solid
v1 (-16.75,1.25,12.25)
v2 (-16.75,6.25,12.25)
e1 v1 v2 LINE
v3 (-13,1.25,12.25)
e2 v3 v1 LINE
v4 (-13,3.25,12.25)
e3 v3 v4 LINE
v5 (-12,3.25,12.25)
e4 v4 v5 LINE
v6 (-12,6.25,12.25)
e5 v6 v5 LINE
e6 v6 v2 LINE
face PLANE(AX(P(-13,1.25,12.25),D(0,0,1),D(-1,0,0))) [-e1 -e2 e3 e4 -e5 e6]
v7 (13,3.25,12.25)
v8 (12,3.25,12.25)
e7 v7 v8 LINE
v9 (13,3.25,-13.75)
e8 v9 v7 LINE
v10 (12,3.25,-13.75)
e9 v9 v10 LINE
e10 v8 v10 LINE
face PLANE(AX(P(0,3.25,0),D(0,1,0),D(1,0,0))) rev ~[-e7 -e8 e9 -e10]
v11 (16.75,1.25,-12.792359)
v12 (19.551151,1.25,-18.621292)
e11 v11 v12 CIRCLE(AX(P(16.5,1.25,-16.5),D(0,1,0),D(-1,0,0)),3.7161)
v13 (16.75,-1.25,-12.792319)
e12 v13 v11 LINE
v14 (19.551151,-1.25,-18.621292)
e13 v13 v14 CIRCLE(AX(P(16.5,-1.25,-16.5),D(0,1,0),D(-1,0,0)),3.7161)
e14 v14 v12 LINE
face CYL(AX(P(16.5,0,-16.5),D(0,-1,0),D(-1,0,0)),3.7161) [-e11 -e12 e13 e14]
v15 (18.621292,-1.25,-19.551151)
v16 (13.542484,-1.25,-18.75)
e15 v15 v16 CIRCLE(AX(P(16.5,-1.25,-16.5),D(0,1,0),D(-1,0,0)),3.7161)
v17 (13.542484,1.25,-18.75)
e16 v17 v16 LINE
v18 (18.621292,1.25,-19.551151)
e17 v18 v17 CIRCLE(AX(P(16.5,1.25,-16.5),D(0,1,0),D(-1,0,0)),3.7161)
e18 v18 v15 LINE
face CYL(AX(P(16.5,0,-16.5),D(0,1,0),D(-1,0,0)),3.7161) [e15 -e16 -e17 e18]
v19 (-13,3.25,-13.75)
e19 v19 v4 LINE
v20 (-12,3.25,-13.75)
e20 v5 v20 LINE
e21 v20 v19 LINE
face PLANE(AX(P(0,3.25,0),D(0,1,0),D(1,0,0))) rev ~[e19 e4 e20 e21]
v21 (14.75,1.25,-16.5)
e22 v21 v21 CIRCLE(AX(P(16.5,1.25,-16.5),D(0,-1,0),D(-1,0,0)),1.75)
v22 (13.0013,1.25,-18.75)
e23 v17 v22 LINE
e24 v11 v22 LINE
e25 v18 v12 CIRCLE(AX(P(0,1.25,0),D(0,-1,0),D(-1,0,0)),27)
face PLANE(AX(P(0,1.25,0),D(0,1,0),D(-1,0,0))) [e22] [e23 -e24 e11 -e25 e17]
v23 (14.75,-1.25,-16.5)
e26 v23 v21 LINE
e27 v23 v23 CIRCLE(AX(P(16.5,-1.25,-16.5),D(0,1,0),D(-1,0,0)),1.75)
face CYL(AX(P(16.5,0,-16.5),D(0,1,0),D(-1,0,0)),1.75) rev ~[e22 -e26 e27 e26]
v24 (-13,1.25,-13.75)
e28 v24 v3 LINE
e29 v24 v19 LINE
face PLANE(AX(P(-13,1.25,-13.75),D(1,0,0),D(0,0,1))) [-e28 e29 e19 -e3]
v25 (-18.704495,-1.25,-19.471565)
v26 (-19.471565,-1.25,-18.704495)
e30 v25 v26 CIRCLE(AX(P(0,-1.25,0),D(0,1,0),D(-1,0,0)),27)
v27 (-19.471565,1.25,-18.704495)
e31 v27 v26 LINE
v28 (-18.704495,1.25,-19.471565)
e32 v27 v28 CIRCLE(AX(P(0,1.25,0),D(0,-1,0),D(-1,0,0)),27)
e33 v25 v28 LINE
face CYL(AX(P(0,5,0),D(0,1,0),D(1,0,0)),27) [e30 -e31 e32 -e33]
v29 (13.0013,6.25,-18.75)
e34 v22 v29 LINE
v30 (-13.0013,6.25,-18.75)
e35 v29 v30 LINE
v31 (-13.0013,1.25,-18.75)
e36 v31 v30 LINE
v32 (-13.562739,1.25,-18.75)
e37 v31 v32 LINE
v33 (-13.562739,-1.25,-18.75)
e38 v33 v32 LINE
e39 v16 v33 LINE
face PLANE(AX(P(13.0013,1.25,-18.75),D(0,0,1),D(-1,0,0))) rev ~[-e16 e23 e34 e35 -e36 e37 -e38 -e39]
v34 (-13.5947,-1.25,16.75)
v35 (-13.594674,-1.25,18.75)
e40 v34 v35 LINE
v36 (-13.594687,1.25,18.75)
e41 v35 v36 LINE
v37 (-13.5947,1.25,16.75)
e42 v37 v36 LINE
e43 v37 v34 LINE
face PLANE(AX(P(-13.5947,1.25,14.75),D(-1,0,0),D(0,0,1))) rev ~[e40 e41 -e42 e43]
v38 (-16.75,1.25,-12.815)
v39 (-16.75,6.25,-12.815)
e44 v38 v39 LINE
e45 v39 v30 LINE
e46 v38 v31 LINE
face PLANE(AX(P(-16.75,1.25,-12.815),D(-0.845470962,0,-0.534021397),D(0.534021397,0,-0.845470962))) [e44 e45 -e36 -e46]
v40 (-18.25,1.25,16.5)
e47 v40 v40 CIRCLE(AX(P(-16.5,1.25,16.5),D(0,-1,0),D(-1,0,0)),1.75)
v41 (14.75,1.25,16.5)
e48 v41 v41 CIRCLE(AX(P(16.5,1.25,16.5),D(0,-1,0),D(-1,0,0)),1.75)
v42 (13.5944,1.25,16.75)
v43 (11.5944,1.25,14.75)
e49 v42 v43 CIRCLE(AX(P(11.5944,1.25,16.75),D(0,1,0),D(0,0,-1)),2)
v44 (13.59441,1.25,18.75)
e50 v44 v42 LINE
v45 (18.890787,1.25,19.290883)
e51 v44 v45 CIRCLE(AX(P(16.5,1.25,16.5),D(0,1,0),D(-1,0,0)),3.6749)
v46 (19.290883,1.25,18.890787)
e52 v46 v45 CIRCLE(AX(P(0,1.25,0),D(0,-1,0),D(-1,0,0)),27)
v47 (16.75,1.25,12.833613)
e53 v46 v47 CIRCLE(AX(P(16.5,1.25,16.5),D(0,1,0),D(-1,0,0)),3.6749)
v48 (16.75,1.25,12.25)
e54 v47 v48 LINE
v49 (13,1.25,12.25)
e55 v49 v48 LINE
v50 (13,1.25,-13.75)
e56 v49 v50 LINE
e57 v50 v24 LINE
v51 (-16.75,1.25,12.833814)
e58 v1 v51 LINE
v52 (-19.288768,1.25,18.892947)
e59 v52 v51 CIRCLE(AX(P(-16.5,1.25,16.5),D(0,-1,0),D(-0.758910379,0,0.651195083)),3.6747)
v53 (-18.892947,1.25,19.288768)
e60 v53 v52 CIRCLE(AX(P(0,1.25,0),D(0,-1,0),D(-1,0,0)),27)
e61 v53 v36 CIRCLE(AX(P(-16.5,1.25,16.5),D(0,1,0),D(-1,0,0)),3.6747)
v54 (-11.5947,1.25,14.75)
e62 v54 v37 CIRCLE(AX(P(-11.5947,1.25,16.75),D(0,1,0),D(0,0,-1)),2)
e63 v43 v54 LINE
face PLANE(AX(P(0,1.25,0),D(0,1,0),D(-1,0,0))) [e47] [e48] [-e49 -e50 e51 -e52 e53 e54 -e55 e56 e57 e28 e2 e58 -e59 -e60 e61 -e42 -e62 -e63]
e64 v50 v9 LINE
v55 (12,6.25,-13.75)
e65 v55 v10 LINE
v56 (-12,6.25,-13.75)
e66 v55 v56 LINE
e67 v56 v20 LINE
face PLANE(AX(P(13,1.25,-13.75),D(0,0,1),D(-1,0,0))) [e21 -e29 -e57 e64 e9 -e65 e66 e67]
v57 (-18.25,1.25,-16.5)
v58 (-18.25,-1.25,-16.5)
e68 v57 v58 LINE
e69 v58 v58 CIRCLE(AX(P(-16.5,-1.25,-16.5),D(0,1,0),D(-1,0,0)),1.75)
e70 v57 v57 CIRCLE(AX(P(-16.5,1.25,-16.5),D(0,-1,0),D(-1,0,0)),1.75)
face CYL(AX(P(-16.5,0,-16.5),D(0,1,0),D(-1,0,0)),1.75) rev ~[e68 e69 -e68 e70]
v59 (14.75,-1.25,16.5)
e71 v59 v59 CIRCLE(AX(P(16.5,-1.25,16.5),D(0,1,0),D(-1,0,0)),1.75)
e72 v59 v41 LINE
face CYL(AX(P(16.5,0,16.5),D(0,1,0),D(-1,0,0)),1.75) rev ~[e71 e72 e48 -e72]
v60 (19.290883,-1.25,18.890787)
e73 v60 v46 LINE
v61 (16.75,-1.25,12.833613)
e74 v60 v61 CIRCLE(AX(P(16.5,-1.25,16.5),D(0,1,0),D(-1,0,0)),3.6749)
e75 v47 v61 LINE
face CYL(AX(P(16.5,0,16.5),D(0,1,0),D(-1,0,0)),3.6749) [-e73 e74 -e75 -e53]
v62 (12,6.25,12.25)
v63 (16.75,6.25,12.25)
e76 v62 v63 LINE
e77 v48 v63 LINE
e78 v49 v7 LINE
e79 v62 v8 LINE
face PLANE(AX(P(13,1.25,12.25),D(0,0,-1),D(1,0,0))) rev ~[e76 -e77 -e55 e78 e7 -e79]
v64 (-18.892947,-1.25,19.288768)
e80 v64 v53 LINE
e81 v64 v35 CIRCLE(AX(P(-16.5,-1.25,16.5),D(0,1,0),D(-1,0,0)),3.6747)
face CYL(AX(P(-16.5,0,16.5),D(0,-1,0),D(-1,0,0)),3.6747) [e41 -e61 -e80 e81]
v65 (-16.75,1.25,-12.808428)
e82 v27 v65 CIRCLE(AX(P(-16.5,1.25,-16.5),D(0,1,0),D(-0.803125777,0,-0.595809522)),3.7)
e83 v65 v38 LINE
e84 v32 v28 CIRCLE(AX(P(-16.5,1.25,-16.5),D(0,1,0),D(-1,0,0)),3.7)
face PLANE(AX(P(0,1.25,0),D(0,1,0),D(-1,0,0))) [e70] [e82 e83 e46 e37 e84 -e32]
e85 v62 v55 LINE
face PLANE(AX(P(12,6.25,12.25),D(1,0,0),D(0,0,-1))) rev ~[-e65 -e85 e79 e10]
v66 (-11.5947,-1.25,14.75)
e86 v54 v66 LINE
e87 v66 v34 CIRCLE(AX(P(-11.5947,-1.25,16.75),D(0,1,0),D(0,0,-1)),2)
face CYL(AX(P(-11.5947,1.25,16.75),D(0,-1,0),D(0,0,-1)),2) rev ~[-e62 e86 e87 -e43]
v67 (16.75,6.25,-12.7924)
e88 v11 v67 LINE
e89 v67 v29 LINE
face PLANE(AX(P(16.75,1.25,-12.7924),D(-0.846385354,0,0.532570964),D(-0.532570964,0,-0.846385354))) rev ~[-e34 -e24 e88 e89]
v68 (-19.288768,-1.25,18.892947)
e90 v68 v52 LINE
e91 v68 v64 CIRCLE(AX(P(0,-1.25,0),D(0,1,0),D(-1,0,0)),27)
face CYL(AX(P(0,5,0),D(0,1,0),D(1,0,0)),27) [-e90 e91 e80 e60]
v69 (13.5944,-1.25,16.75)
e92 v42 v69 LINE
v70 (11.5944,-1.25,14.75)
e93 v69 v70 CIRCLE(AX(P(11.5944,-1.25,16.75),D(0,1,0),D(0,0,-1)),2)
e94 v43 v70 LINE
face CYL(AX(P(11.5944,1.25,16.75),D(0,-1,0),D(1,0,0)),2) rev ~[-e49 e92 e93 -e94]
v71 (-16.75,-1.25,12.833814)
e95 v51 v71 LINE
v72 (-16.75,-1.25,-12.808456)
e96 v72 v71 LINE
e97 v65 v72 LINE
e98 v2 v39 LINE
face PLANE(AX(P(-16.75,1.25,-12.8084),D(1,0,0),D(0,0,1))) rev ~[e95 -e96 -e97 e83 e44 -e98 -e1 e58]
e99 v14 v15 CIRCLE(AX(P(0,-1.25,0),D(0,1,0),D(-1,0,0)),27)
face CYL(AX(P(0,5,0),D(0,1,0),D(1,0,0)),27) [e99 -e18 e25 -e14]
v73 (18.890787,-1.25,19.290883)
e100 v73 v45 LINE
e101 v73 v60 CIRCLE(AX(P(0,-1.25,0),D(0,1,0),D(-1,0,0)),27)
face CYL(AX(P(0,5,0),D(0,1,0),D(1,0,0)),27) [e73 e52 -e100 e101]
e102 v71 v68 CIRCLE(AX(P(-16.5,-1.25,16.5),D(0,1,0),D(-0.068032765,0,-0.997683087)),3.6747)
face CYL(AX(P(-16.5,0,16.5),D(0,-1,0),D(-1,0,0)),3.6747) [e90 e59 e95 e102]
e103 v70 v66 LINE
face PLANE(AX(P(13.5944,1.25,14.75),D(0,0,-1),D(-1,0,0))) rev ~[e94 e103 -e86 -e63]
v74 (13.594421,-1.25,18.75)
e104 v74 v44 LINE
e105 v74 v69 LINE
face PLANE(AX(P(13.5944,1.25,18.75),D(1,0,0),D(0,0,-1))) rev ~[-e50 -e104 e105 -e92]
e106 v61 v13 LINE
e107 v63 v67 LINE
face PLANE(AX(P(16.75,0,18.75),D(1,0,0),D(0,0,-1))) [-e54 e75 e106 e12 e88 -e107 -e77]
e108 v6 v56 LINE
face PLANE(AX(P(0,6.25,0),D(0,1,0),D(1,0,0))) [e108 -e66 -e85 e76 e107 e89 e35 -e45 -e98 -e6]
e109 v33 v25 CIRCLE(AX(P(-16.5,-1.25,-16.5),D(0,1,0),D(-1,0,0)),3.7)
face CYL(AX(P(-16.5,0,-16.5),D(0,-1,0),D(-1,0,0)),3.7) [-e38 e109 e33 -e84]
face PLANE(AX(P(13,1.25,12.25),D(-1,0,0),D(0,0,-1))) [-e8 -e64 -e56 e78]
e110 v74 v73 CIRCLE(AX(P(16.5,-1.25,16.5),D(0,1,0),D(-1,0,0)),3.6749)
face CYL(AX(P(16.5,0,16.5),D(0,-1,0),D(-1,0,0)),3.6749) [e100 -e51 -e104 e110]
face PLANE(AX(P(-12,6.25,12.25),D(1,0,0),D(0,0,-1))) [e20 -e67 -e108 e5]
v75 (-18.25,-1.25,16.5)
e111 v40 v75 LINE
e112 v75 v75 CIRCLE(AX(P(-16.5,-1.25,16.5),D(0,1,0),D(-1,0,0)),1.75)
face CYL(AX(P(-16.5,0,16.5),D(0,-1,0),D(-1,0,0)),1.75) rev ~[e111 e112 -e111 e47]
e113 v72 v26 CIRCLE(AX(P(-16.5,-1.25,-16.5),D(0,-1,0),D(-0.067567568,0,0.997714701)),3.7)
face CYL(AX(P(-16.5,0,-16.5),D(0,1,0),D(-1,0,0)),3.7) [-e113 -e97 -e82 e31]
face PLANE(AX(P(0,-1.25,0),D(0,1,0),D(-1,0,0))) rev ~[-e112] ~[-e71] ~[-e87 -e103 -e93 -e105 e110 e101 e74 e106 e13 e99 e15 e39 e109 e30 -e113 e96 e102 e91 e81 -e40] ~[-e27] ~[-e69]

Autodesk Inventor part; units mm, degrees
ref_plane "YZ Plane" through (0, 0, 0) normal (1, 0, 0) x (0, 1, 0)
sketch "Skizze1" plane through (0, 0, 0) normal (0, 1, 0) x (-1, 0, 0)
  circle A0 centre (0, 0) radius 30
  circle A1 centre (0, 0) radius 27
  dimension "d0" = 60
  dimension "d1" = 54
extrude "Extrusion1" add sketch "Skizze1" along normal mid plane 10
sketch "Skizze5" plane through (0, 0, 0) normal (0, 1, 0) x (-1, 0, 0)
  line L0 (12.75, -14.75) -> (-12.75, -14.75)
  line L1 (-12.75, -14.75) -> (-12.75, 14.75)
  line L2 (-12.75, 14.75) -> (12.75, 14.75)
  line L3 (12.75, 14.75) -> (12.75, -14.75)
  line L4 (49.4097, 0) -> (-52.5504, 0) construction
  line L5 (0, -53.7913) -> (0, 68.1535) construction
  line L6 (-16.75, -18.75) -> (16.75, -18.75)
  line L7 (16.75, -18.75) -> (16.75, 18.75)
  line L8 (16.75, 18.75) -> (-16.75, 18.75)
  line L9 (-16.75, 18.75) -> (-16.75, -18.75)
  point P0 (0, 0)
  dimension "d33" = 29.5
  dimension "d34" = 25.5
  dimension "d35" = 4
extrude "Extrusion5" add sketch "Skizze5" along normal mid plane 2.5 contours L0 L1 L2 L3 | L9 L8 L7 L6
ref_plane "Arbeitsebene1" through (0, 0, 0) normal (0, 1, 0) x (-1, 0, 0)
chamfer "Fase1" distance 1 angle 45 2 edges at (30, 5, 0) (30, -5, 0)
sketch "Skizze2" plane through (0, 0, 0) normal (0, 1, 0) x (-1, 0, 0)
  line L0 (0, 42.2301) -> (0, -36.7007) construction
  line L1 (32.6355, 0) -> (-32.6355, 0) construction
  line L2 (16.5, 34.419) -> (16.5, -40.3324) construction
  line L3 (-16.5, 35.4304) -> (-16.5, -34.8157) construction
  line L4 (23.5881, 16.5) -> (-32.0387, 16.5) construction
  line L5 (23.5881, -16.5) -> (-39.8541, -16.5) construction
  circle A0 centre (16.5, -16.5) radius 1.75
  circle A1 centre (16.5, 16.5) radius 1.75
  circle A2 centre (-16.5, 16.5) radius 1.75
  circle A3 centre (-16.5, -16.5) radius 1.75
  circle A4 centre (-16.5, 16.5) radius 3.6749
  circle A5 centre (-16.5, -16.5) radius 3.7161
  circle A6 centre (16.5, -16.5) radius 3.7
  circle A7 centre (16.5, 16.5) radius 3.6747
  point P0 (0, 0)
  dimension "d8" = 33
  dimension "d9" = 33
  dimension "d10" = 3.5
  dimension "d11" = 3.5
  dimension "d12" = 3.5
  dimension "d13" = 3.5
extrude "Extrusion2" add sketch "Skizze2" along normal mid plane 2.5
ref_plane "Arbeitsebene2" through (0, 0, -30.5) normal (0, 0, 1) x (1, 0, 0)
extrude "Extrusion6" cut sketch "Skizze2" against normal mid plane 3 contours A0 | A1 | A2 | A3
sketch "Skizze12" plane through (0, 5, 0) normal (0, 1, 0) x (1, 0, 0)
  circle A0 centre (0, 0) radius 27
  circle A1 centre (0, 0) radius 31.5802
extrude "Extrusion13" cut sketch "Skizze12" against normal blind 10
sketch "Skizze13" plane through (0, 1.25, 0) normal (0, 1, 0) x (1, 0, 0)
  line L0 (-13.5947, -18.75) -> (13.5944, -18.75) projected
  line L1 (-13.5947, -18.75) -> (13.5944, -18.75)
  line L2 (13.5944, -18.75) -> (13.5944, -14.75)
  line L3 (13.5944, -14.75) -> (-13.5947, -14.75)
  line L4 (-13.5947, -14.75) -> (-13.5947, -18.75)
  point P0 (0, 0)
  dimension "d58" = 4
extrude "Extrusion14" cut sketch "Skizze13" against normal blind 3
fillet "Rundung4" radius 2 2 edges at (13.5944, 0, 14.75) (-13.5947, 0, 14.75)
sketch "Skizze14" plane through (0, 1.25, 0) normal (0, 1, 0) x (1, 0, 0)
  line L0 (-13, -12.25) -> (13, -12.25)
  line L1 (13, -12.25) -> (13, 13.75)
  line L2 (13, 13.75) -> (-13, 13.75)
  line L3 (-13, 13.75) -> (-13, -12.25)
  line L4 (0, -43.7267) -> (0, 49.5069) construction
  line L5 (-24.7381, 0) -> (29.5694, 0) construction
  line L6 (13.5425, 18.75) -> (-13.5627, 18.75) construction
  line L7 (-13, -12.25) -> (-16.75, -12.25)
  line L8 (-16.75, 12.8084) -> (-16.75, -12.8338) projected
  line L9 (-16.75, -12.25) -> (-16.75, 12.815)
  line L10 (-16.75, 12.815) -> (-13.0013, 18.75)
  line L11 (13, -12.25) -> (16.75, -12.25)
  line L12 (16.75, -12.8336) -> (16.75, 12.7924) projected
  arc A0 (16.75, 12.7924) -> (19.551, 18.6215) centre (16.5, 16.5) ccw projected
  line L13 (16.75, -12.25) -> (16.75, 12.7924)
  line L14 (16.75, 12.7924) -> (13.0013, 18.75)
  line L15 (13.0013, 18.75) -> (-13.0013, 18.75)
  point P0 (0, 0)
  dimension "d62" = 26
  dimension "d63" = 26
  dimension "d64" = 5
extrude "Extrusion15" add sketch "Skizze14" along normal blind 5 contours L7 L8 L9 L10 L15 L14 L12 L11 L1 L2 L3
sketch "Skizze15" plane through (0, 6.25, 0) normal (0, 1, 0) x (1, 0, 0)
  line L0 (-13, 13.75) -> (-13, -12.25) projected
  line L1 (13, 13.75) -> (-13, 13.75) projected
  line L2 (-13, -12.25) -> (-12, -12.25)
  line L3 (-12, -12.25) -> (-12, 13.75)
  line L4 (-12, 13.75) -> (-13, 13.75)
  line L5 (-13, 13.75) -> (-13, -12.25)
  line L6 (13, -12.25) -> (16.75, -12.25) projected
  line L7 (13, -12.25) -> (12, -12.25)
  line L8 (12, -12.25) -> (12, 13.75)
  line L9 (12, 13.75) -> (13, 13.75)
  line L10 (13, 13.75) -> (13, -12.25)
  point P0 (0, 0)
  dimension "d67" = 1
  dimension "d68" = 1
extrude "Extrusion16" add sketch "Skizze15" against normal blind 3
properties part number "_3D-Druck"
